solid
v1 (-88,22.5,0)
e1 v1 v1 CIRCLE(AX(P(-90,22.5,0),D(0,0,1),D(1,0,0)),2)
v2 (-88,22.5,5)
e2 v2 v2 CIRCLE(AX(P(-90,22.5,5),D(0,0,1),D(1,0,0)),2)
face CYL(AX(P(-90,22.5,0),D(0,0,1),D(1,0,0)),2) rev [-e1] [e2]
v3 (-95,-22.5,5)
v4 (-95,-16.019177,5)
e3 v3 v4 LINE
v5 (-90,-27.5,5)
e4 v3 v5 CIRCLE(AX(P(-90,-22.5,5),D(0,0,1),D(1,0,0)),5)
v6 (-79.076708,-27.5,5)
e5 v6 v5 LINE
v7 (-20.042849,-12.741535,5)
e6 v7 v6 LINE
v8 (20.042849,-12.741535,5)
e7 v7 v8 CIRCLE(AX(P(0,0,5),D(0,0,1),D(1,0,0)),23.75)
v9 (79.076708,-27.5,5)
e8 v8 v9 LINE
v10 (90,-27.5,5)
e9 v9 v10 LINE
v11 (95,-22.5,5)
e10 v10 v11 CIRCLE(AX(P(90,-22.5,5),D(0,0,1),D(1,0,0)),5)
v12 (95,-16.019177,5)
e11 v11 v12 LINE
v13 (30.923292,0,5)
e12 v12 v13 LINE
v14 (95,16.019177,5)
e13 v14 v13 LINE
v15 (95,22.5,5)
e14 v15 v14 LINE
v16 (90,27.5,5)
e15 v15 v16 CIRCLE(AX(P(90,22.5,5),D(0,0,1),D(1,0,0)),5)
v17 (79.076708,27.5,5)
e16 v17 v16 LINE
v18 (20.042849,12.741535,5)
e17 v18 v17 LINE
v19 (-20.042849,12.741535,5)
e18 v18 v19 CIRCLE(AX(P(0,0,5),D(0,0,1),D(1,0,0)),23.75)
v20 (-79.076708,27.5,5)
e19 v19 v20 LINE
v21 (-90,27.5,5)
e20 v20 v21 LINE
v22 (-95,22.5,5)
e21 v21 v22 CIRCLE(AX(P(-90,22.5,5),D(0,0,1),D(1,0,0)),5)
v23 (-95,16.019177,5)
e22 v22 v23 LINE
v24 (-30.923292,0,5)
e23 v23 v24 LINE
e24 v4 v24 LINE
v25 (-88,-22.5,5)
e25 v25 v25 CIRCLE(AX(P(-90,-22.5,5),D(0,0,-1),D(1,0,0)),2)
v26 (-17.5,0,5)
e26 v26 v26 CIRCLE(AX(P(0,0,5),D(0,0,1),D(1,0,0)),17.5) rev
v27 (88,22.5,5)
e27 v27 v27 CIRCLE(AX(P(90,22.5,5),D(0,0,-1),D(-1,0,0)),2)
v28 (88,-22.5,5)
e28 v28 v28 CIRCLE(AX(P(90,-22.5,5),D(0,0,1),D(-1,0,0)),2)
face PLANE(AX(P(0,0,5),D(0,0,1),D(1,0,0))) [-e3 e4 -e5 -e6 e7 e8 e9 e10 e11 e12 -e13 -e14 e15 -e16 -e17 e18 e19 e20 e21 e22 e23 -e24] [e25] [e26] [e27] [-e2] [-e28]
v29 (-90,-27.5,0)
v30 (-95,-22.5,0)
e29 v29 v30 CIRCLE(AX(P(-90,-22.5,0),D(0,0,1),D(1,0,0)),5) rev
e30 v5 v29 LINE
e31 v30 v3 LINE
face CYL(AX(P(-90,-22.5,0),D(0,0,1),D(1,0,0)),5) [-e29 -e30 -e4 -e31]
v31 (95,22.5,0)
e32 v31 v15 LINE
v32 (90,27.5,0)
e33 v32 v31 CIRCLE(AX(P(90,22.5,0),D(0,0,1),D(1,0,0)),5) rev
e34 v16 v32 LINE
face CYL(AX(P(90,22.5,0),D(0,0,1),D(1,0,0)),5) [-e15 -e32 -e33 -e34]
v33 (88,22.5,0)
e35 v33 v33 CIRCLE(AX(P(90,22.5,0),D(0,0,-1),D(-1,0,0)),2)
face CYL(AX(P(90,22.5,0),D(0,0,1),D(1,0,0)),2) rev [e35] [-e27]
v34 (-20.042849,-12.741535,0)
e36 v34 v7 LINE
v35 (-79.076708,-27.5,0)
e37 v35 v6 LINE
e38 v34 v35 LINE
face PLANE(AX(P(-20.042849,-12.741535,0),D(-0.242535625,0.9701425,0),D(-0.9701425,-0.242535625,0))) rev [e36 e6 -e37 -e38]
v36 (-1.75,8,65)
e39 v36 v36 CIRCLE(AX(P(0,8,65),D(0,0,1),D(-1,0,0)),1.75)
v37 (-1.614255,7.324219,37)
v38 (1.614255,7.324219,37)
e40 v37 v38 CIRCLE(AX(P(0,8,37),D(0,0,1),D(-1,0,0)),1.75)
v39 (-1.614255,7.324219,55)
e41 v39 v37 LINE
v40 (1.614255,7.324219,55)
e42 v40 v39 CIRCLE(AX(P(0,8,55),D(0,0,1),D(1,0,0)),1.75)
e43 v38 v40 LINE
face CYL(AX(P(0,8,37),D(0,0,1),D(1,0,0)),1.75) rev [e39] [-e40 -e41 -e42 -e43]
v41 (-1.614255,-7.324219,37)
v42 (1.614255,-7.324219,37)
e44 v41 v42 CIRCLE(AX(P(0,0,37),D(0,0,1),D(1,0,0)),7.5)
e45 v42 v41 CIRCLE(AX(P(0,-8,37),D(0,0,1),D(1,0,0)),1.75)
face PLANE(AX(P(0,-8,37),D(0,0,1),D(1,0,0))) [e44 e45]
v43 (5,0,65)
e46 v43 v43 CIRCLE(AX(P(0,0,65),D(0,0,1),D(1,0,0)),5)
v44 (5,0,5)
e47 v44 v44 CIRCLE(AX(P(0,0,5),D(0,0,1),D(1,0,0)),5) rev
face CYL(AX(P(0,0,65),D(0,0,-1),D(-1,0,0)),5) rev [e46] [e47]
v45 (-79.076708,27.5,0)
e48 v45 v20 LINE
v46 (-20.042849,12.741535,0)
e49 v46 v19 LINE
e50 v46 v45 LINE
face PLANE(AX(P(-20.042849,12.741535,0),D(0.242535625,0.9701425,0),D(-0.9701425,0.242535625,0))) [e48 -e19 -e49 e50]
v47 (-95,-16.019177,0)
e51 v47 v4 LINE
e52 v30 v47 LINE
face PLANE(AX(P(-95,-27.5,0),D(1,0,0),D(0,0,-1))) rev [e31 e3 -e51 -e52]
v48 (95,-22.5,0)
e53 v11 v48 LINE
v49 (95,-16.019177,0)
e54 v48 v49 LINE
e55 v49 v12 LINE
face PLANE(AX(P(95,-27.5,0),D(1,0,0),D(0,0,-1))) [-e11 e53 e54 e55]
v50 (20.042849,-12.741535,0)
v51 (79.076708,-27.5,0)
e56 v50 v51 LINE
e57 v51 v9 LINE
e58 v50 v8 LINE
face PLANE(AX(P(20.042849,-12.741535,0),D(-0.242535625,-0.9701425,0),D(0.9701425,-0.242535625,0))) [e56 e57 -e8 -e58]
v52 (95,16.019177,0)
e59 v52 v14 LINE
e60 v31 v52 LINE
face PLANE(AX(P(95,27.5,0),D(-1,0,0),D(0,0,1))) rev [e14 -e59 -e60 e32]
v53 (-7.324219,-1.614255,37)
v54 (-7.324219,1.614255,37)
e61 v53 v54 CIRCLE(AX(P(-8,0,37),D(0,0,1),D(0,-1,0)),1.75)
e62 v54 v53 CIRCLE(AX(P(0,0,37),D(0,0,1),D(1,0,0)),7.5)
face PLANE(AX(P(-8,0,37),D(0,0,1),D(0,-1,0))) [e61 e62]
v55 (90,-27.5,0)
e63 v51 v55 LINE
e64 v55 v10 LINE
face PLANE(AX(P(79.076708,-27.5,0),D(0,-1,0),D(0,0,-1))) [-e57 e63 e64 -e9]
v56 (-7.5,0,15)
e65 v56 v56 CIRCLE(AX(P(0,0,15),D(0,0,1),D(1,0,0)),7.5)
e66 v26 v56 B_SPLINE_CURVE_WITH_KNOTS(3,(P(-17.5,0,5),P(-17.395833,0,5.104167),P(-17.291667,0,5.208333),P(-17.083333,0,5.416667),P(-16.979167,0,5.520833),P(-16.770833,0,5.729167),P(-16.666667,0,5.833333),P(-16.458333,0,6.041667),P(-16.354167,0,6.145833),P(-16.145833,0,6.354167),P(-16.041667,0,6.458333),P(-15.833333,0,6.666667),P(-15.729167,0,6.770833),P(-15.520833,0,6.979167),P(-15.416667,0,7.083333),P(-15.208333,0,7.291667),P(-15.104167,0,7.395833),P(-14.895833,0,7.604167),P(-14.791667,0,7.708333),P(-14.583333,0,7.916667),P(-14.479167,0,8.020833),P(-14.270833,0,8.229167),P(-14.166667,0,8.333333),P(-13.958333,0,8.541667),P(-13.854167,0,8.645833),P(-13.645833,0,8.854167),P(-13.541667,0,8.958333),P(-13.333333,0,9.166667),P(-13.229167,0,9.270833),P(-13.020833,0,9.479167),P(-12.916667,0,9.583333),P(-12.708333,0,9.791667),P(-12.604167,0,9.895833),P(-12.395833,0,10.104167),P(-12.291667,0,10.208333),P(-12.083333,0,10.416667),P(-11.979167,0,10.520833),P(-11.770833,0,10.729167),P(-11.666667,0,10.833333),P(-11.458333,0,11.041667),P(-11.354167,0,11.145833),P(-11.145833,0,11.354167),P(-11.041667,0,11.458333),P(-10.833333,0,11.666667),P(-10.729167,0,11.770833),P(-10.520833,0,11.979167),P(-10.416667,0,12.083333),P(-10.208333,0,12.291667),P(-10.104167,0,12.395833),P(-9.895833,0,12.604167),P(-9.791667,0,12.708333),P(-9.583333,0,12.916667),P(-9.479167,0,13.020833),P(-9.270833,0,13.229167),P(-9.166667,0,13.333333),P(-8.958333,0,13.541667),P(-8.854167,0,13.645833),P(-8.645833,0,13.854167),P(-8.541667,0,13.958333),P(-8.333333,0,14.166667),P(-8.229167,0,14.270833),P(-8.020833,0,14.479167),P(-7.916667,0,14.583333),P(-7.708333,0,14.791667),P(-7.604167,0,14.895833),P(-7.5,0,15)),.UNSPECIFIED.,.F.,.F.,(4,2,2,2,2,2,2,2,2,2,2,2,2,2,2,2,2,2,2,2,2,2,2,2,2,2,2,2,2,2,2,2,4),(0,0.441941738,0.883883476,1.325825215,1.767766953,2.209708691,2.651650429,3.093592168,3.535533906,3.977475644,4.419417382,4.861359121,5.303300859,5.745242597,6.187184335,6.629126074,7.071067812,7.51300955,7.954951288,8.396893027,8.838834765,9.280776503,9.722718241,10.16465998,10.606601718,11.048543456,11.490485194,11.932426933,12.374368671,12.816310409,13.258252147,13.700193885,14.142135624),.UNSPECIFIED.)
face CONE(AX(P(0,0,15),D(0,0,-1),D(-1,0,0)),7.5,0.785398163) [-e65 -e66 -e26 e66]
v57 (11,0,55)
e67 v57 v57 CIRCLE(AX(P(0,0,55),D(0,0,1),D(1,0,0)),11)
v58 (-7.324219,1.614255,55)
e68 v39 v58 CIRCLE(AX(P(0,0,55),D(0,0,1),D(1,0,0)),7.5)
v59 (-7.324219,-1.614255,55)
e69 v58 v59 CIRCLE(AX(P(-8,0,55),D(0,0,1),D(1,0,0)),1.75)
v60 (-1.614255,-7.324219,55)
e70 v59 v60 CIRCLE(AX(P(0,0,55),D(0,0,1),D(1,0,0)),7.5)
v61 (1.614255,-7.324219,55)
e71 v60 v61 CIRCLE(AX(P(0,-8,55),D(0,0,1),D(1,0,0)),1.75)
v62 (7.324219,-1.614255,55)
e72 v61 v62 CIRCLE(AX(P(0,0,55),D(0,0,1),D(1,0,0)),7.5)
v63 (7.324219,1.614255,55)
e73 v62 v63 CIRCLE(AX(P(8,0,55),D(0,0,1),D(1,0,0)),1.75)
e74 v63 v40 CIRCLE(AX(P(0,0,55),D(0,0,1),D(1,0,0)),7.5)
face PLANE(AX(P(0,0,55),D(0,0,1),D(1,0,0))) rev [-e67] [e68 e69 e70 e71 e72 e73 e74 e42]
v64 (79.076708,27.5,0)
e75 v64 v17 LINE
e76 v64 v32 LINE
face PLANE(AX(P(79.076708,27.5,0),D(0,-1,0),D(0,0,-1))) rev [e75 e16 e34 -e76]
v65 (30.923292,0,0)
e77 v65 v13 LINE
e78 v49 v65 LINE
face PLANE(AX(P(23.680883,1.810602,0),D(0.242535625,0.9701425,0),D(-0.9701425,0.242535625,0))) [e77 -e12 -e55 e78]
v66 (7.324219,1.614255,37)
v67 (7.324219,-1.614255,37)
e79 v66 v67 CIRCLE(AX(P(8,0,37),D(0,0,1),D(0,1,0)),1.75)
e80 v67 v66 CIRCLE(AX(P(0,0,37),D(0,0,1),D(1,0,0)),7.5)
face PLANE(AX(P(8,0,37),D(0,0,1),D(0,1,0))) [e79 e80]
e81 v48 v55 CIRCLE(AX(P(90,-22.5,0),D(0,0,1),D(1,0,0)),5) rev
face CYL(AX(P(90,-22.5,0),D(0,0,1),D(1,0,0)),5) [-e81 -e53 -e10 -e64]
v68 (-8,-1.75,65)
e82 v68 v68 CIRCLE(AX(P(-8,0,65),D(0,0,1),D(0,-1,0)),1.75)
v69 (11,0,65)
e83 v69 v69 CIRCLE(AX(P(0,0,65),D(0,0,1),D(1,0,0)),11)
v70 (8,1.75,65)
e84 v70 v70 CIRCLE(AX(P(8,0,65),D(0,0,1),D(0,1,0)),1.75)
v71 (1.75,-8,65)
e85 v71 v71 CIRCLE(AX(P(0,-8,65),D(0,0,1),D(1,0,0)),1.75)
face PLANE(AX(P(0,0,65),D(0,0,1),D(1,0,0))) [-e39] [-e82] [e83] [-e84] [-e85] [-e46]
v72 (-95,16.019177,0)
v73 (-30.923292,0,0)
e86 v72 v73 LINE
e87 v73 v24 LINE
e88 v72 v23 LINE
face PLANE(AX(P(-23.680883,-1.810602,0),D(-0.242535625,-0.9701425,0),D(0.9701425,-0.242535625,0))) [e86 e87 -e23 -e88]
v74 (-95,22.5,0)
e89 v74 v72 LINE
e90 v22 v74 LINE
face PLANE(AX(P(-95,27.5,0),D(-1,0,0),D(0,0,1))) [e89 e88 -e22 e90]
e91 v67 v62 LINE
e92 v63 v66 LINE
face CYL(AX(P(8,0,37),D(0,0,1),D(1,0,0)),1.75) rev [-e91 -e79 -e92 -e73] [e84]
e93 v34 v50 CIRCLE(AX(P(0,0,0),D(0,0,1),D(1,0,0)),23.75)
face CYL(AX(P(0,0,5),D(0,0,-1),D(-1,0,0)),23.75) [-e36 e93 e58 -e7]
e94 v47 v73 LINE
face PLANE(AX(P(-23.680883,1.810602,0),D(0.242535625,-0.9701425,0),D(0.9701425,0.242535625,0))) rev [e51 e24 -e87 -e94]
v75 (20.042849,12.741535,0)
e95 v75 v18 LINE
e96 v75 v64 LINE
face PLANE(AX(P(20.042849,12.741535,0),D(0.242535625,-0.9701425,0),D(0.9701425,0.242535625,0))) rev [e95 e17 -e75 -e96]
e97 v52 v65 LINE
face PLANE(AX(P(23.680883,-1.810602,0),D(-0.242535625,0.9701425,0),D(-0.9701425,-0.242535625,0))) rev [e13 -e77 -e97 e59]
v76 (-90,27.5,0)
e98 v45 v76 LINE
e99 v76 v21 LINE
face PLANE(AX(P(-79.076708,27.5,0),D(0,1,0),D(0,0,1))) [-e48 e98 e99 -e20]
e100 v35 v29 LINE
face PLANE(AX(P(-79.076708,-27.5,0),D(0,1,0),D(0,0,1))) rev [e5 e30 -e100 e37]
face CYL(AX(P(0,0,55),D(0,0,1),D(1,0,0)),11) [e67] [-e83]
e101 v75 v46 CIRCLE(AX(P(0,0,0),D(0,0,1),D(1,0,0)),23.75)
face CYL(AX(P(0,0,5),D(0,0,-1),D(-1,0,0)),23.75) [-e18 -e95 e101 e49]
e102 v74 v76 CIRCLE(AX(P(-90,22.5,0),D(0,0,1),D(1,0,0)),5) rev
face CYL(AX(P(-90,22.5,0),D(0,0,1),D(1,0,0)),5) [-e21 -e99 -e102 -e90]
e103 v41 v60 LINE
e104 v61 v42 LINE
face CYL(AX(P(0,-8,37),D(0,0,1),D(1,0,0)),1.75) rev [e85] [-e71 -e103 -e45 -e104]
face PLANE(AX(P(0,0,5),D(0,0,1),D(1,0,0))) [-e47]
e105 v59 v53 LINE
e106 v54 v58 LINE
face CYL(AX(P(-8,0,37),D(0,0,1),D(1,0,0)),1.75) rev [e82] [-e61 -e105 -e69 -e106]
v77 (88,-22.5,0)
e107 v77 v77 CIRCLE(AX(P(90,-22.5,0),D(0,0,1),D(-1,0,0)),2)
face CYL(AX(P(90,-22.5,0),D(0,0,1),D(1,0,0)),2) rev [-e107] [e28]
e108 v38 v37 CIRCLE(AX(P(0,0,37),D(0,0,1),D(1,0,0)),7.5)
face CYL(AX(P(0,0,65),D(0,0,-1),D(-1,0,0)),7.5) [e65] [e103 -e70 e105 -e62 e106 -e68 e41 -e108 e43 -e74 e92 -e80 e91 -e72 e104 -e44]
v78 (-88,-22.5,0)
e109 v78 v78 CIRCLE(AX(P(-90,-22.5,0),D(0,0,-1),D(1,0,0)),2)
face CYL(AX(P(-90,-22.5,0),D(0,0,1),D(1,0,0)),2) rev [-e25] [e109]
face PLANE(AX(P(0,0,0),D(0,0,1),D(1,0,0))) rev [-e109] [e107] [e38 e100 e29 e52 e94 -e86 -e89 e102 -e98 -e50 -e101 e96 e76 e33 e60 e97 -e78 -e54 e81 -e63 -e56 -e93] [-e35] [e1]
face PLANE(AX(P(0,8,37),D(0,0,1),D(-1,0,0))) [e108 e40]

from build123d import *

# Parameters (mm, degrees)
ESBO_O1_R                = 23.75
RESSALTO_EXTRUS_O1_DEPTH = 5
ESBO_O8_R                = 2
RESSALTO_EXTRUS_O2_DEPTH = 5
ESBO_O9_R                = 7.5
ESBO_O9_R_2              = 5
RESSALTO_EXTRUS_O3_DEPTH = 60
RESSALTO_EXTRUS_O4_START = -10
ESBO_O10_R               = 11
ESBO_O10_R_2             = 5
RESSALTO_EXTRUS_O4_DEPTH = 10
ESBO_O11_R               = 1.75
CORTE_EXTRUS_O1_DEPTH    = 28
PADR_OCIRCULAR2_COUNT    = 4
CHANFRO1_SIZE            = 10
FILETE1_R                = 5
FILETE1_OF_ESPELHAR4_R   = 5
ESPELHAR5_OUTLINE_R      = 2
ESPELHAR5_DEPTH          = 5


# Read off the part's stored shape, not the designer's step: Espelhar5
with BuildPart() as part:
    # Esboço1 → Ressalto-extrusão1 (new body)
    with BuildSketch(Plane.XY):
        Circle(ESBO_O1_R)
    extrude(amount=RESSALTO_EXTRUS_O1_DEPTH)

    # Esboço8 → Ressalto-extrusão2 (add)
    with BuildSketch(Plane.XY.offset(5)):
        Polygon((-20.042848617, 12.741535202), (-79.076707808, 27.5), (-95, 27.5), (-95, 16.019176952), (-23.680882993, -1.8106023), align=None)
        with Locations((-90, 22.5)):
            Circle(ESBO_O8_R, mode=Mode.SUBTRACT)
    ressalto_extrus_o2 = extrude(amount=-RESSALTO_EXTRUS_O2_DEPTH)

    # Esboço9 → Ressalto-extrusão3 (add)
    with BuildSketch(Plane.XY.offset(5)):
        Circle(ESBO_O9_R)
        Circle(ESBO_O9_R_2, mode=Mode.SUBTRACT)
    extrude(amount=RESSALTO_EXTRUS_O3_DEPTH)

    # Esboço10 → Ressalto-extrusão4 (add)
    with BuildSketch(Plane.XY.offset(65).offset(RESSALTO_EXTRUS_O4_START)):
        Circle(ESBO_O10_R)
        Circle(ESBO_O10_R_2, mode=Mode.SUBTRACT)
    extrude(amount=RESSALTO_EXTRUS_O4_DEPTH)

    # Esboço11 → Corte-extrusão1 (cut)
    with BuildSketch(Plane.XY.offset(65)):
        with Locations((0, -8)):
            Circle(ESBO_O11_R)
    corte_extrus_o1 = extrude(amount=-CORTE_EXTRUS_O1_DEPTH, mode=Mode.SUBTRACT)

    # PadrãoCircular2: Corte-extrusão1 ×4 about axis
    padr_ocircular2_axis = Axis((0, 0, 0), (0, 0, 1))
    for i in range(1, PADR_OCIRCULAR2_COUNT):
        add(corte_extrus_o1.rotate(padr_ocircular2_axis, i * 360 / PADR_OCIRCULAR2_COUNT), mode=Mode.SUBTRACT)

    # Chanfro1
    chanfro1_edges = [part.edges().sort_by_distance(p)[0] for p in [
        (-7.5, 0, 5),
    ]]
    chamfer(chanfro1_edges, length=CHANFRO1_SIZE)

    # Filete1
    filete1_edges = [part.edges().sort_by_distance(p)[0] for p in [
        (-95, 27.5, 2.5),
    ]]
    fillet(filete1_edges, radius=FILETE1_R)

    # Espelhar4: Ressalto-extrusão2 across plane
    add(ressalto_extrus_o2.mirror(Plane.ZX))

    # Filete1 of Espelhar4
    filete1_of_espelhar4_edges = [part.edges().sort_by_distance(p)[0] for p in [
        (-95, -27.5, 2.5),
    ]]
    fillet(filete1_of_espelhar4_edges, radius=FILETE1_OF_ESPELHAR4_R)

    # Espelhar5 outline → Espelhar5 (add)
    with BuildSketch(Plane.XY):
        with BuildLine():
            Line((95, -22.5), (95, -16.019176952))
            Line((95, -16.019176952), (30.923292192, 0))
            Line((30.923292192, 0), (95, 16.019176952))
            Line((95, 16.019176952), (95, 22.5))
            ThreePointArc((95, 22.5), (93.535533906, 26.035533906), (90, 27.5))
            Line((90, 27.5), (79.076707808, 27.5))
            Line((79.076707808, 27.5), (20.042848617, 12.741535202))
            ThreePointArc((20.042848617, 12.741535202), (23.75, 0), (20.042848617, -12.741535202))
            Line((20.042848617, -12.741535202), (79.076707808, -27.5))
            Line((79.076707808, -27.5), (90, -27.5))
            ThreePointArc((90, -27.5), (93.535533906, -26.035533906), (95, -22.5))
        make_face()
        with Locations((90, -22.5)):
            Circle(ESPELHAR5_OUTLINE_R, mode=Mode.SUBTRACT)
        with Locations((90, 22.5)):
            Circle(ESPELHAR5_OUTLINE_R, mode=Mode.SUBTRACT)
    extrude(amount=ESPELHAR5_DEPTH)


solid = part.part
